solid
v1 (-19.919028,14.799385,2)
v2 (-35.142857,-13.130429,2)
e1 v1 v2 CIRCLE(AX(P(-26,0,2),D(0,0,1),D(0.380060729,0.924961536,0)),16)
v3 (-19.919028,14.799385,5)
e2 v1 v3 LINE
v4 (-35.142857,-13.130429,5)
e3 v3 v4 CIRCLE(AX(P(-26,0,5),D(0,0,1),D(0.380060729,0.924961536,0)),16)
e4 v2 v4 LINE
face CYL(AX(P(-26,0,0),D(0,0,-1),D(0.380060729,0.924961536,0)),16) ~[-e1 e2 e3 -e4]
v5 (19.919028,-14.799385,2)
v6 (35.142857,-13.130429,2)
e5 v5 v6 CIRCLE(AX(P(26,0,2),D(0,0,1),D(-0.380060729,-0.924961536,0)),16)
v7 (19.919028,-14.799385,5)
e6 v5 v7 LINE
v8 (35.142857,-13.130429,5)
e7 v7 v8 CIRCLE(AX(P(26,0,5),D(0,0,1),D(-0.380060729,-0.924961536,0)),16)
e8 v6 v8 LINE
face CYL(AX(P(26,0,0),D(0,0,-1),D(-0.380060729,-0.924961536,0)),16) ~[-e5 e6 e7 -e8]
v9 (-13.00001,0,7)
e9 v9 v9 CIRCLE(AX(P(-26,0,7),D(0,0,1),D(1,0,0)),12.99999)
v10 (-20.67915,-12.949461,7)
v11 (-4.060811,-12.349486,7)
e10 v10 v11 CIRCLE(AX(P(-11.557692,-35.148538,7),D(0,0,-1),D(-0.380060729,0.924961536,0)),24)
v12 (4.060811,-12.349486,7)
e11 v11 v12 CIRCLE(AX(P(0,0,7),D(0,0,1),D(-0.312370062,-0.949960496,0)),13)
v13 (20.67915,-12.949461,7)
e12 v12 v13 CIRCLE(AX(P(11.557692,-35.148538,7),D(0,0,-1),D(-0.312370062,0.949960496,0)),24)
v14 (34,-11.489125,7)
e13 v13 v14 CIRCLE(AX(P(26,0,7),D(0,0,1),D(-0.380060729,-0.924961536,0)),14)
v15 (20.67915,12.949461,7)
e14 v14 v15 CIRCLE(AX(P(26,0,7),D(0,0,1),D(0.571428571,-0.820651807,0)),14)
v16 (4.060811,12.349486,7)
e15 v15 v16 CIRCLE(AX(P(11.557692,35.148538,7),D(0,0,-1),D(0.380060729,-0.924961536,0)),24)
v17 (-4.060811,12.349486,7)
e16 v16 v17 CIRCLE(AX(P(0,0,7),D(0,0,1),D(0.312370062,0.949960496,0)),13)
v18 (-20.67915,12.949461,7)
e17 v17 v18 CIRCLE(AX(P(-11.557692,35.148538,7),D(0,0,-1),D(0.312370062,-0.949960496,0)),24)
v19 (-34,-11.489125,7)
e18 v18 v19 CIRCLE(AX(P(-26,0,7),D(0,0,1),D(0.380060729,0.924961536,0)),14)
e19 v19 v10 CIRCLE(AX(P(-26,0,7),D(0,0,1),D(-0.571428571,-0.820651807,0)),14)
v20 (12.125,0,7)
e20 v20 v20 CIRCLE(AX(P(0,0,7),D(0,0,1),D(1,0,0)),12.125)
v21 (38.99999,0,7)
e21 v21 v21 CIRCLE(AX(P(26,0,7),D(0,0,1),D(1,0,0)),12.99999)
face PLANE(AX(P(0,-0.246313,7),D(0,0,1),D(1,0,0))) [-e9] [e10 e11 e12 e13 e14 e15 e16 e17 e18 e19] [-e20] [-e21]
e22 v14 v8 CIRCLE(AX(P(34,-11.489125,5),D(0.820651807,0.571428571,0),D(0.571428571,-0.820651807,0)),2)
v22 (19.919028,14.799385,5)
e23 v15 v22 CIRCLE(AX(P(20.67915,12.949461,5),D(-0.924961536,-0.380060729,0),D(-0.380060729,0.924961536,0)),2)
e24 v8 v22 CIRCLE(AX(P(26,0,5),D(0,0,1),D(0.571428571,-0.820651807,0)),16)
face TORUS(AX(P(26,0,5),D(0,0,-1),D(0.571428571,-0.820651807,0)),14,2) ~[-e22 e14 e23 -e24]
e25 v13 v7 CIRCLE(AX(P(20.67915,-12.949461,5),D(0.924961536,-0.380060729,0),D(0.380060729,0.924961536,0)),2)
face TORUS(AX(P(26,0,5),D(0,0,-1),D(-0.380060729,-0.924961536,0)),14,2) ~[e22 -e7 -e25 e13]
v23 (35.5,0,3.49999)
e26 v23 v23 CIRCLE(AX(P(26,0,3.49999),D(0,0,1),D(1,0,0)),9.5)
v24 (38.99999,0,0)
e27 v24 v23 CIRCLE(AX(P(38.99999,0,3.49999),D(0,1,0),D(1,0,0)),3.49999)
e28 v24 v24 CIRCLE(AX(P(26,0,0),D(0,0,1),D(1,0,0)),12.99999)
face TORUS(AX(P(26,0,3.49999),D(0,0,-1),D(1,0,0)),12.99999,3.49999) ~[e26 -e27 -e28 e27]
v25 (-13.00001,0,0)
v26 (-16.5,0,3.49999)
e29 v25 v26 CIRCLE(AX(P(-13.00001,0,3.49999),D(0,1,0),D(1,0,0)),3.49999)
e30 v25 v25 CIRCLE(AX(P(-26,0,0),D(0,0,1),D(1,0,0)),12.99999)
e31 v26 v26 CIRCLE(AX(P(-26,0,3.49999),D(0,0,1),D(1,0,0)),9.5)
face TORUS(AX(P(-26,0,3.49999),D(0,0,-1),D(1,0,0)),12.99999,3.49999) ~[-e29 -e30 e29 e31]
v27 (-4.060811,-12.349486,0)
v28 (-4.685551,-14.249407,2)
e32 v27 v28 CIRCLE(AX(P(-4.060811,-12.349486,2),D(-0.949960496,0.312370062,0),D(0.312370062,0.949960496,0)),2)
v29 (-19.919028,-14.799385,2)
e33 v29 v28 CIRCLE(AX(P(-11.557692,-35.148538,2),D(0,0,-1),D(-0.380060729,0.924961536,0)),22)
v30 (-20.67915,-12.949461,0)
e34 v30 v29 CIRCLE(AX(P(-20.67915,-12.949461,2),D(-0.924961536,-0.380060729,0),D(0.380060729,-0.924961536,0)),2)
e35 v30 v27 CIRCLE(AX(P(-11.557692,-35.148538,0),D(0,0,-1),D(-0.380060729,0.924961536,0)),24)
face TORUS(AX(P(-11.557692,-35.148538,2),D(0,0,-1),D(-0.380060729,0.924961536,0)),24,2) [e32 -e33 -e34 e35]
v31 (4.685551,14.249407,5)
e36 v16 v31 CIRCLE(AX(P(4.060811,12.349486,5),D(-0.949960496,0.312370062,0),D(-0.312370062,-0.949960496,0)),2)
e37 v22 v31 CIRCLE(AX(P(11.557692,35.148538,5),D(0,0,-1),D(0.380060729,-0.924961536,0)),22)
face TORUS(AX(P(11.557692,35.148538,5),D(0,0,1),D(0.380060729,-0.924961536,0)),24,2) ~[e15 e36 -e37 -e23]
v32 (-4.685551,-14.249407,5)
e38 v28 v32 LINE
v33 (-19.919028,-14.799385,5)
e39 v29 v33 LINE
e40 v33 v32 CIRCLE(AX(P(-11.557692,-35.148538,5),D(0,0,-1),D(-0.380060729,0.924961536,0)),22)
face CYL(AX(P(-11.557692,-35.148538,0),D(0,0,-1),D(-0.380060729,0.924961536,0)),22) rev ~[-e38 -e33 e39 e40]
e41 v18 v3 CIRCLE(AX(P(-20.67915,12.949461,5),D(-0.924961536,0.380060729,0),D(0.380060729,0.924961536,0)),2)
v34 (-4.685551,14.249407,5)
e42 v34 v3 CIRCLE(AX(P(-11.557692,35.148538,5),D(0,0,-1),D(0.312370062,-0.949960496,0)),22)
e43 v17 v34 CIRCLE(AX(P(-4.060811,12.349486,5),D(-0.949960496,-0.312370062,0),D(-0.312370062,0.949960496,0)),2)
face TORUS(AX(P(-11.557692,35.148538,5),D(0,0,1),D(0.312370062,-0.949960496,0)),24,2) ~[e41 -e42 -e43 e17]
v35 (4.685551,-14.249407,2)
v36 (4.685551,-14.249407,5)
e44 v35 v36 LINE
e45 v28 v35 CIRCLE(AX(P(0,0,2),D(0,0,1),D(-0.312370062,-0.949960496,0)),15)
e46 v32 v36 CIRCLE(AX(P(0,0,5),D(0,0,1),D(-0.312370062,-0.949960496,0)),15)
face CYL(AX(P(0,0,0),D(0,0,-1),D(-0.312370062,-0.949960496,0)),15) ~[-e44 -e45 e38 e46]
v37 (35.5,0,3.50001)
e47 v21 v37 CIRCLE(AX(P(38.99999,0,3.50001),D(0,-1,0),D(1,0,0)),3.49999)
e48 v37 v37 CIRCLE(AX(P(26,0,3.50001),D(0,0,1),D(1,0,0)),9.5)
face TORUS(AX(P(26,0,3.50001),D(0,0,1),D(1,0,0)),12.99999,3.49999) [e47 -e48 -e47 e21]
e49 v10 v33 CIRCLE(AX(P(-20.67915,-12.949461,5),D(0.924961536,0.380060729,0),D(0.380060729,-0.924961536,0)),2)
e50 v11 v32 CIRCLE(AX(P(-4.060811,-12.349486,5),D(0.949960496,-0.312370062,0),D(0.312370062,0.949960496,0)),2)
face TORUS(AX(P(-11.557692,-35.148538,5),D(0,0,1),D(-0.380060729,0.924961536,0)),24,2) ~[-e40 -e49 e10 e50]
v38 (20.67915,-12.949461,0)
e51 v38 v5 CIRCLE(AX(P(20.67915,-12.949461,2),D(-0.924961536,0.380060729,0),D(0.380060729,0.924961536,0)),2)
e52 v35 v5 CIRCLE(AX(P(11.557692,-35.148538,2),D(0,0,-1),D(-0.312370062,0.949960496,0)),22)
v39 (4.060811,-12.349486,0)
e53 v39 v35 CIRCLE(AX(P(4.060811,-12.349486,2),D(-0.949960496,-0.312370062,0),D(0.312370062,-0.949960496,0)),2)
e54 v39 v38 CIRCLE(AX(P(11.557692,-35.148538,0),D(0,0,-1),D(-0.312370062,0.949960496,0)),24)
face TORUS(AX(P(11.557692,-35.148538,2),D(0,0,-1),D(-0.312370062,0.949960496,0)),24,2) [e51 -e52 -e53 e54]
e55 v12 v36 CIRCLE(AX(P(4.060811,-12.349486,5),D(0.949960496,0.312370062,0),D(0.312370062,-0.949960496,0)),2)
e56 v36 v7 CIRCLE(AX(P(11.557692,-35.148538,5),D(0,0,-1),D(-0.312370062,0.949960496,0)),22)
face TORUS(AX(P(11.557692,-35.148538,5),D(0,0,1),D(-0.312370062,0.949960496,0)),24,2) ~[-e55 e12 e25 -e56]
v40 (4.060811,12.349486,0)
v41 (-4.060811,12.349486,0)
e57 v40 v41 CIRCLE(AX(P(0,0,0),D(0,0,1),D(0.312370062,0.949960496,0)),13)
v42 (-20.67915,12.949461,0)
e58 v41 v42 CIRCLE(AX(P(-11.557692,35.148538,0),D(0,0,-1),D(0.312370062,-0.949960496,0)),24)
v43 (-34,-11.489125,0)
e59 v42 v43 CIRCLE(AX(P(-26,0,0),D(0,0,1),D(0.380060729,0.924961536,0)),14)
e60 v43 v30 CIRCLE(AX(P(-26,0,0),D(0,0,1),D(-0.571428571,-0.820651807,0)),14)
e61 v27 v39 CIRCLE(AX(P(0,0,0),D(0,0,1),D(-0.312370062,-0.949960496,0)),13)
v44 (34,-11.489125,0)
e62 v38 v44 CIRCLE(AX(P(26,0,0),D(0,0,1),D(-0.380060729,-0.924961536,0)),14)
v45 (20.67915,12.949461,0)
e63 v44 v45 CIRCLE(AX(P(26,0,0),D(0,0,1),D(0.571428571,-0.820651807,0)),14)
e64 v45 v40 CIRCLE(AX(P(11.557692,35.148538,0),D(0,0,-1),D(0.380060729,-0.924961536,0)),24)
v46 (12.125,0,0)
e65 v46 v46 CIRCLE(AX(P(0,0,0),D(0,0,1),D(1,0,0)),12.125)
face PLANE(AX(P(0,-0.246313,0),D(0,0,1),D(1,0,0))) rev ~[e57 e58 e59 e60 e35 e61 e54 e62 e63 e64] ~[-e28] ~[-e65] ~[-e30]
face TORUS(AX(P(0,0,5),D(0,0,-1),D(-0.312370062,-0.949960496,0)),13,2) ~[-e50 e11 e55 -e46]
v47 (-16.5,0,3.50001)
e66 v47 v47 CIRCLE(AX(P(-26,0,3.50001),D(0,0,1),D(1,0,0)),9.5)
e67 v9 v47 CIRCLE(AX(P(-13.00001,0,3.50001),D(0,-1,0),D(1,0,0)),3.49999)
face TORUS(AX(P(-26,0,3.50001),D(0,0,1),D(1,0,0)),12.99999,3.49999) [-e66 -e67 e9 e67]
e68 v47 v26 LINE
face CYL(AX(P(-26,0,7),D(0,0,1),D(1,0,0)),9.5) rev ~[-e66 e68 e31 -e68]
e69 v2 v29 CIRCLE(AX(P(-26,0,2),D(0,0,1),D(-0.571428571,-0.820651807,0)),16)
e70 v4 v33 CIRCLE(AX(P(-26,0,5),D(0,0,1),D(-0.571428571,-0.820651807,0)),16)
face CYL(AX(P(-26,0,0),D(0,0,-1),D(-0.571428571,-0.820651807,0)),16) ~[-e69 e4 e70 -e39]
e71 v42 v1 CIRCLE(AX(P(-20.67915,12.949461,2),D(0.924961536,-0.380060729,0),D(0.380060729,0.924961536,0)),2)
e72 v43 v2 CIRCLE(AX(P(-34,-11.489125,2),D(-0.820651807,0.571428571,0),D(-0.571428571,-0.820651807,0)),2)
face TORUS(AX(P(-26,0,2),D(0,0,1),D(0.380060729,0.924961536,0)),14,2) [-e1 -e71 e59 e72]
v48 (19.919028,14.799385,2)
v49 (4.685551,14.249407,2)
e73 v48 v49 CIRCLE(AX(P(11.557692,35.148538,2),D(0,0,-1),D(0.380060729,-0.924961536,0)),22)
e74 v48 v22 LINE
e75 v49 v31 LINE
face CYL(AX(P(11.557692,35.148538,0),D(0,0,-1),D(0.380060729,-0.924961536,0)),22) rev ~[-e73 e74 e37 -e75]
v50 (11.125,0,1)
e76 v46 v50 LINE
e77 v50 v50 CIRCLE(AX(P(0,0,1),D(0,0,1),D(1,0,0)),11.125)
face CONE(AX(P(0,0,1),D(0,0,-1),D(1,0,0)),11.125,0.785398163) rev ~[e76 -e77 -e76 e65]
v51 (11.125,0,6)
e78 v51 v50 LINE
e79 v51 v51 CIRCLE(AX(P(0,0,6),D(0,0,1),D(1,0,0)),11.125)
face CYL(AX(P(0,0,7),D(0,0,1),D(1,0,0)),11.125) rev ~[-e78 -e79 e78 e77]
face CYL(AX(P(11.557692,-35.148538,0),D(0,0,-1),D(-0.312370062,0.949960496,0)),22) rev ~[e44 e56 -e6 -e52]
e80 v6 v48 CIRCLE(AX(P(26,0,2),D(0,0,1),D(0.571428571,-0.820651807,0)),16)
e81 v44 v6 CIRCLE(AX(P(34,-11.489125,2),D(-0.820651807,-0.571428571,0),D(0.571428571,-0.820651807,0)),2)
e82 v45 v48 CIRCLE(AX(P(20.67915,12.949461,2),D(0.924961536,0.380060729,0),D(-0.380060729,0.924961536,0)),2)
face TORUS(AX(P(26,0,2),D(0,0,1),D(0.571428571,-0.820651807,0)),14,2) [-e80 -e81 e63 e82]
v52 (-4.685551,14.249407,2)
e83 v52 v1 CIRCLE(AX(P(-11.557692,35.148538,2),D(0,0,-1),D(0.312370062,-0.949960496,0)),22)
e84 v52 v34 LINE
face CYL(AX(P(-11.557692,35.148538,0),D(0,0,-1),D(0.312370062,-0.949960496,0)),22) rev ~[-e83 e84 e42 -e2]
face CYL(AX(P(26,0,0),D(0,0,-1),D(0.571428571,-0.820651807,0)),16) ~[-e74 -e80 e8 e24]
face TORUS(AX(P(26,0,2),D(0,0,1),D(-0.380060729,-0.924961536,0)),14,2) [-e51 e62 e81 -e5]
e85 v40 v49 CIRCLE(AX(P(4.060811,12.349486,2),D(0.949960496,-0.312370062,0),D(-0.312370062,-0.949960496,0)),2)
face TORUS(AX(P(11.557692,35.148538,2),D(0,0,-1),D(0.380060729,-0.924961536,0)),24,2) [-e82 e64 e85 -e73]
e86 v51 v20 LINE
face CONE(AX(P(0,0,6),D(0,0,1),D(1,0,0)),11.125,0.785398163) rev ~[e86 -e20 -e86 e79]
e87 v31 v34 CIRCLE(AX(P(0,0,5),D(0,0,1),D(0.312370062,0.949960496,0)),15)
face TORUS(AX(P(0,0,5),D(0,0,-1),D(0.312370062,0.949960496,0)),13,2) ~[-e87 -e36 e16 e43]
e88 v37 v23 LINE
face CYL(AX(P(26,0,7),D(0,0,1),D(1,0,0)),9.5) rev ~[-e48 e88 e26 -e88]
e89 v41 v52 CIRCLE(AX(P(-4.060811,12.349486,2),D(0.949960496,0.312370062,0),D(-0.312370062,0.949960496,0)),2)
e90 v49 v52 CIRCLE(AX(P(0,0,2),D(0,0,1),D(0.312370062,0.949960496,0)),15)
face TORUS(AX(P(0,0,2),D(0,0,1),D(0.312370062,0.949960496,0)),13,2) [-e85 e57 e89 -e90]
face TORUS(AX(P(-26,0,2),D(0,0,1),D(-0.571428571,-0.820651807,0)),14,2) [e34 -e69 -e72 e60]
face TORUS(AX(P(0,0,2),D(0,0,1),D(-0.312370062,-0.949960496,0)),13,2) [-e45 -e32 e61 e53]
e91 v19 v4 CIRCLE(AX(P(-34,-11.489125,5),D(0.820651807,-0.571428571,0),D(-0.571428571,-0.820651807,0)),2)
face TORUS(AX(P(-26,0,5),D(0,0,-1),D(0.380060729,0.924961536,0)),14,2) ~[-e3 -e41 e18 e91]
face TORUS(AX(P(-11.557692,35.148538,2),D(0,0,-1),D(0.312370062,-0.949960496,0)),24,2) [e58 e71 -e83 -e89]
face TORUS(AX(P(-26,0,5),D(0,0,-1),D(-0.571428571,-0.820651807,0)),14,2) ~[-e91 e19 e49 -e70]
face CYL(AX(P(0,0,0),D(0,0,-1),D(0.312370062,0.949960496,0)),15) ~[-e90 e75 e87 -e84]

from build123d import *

# Parameters (mm, degrees)
F1_DEPTH = 7
F2_R     = 11.125
F3_DEPTH = 7.001
F4_R     = 2
F5_R     = 9.5
F6_DEPTH = 7.001
F7_R     = 3.49999
F8_SIZE  = 1


# Not quite as in the source:
# - a fillet or chamfer is up to 0.001 mm smaller than in the source, because OpenCascade refuses the exact size


with BuildPart() as f1:
    # F0 (on Top) → F1 (new body)
    with BuildSketch(Plane.XY):
        with BuildLine():
            ThreePointArc((-19.9190283401, -14.7993845707), (-12.3514453516, -13.1628621978), (-4.6855509356, -14.2494074414))
            ThreePointArc((-4.6855509356, -14.2494074414), (0, -15), (4.6855509356, -14.2494074414))
            ThreePointArc((4.6855509356, -14.2494074414), (12.3514453516, -13.1628621978), (19.9190283401, -14.7993845707))
            ThreePointArc((19.9190283401, -14.7993845707), (27.7435994179, -15.9047119141), (35.1428571429, -13.1304289064))
            ThreePointArc((35.1428571429, -13.1304289064), (40.048573091, 7.6575187957), (19.9190283401, 14.7993845707))
            ThreePointArc((19.9190283401, 14.7993845707), (12.3514453516, 13.1628621978), (4.6855509356, 14.2494074414))
            ThreePointArc((4.6855509356, 14.2494074414), (0, 15), (-4.6855509356, 14.2494074414))
            ThreePointArc((-4.6855509356, 14.2494074414), (-12.3514453516, 13.1628621978), (-19.9190283401, 14.7993845707))
            ThreePointArc((-19.9190283401, 14.7993845707), (-40.048573091, 7.6575187957), (-35.1428571429, -13.1304289064))
            ThreePointArc((-35.1428571429, -13.1304289064), (-27.7435994179, -15.9047119141), (-19.9190283401, -14.7993845707))
        make_face()
    extrude(amount=F1_DEPTH)

    # F2 (on face) → F3 (cut, through all)
    with BuildSketch(Plane.XY.offset(7)):
        Circle(F2_R)
    extrude(amount=-F3_DEPTH, mode=Mode.SUBTRACT)

    # F4
    f4_edges = [f1.edges().sort_by_distance(p)[0] for p in [
        (-19.919028, -14.799385, 3.5),
        (-42, 0, 0),
        (-19.919028, 14.799385, 3.5),
        (-42, 0, 7),
        (-4.685551, -14.249407, 3.5),
        (-12.351445, -13.162862, 0),
        (-12.351445, -13.162862, 7),
        (4.685551, -14.249407, 3.5),
        (0, -15, 0),
        (0, -15, 7),
        (19.919028, -14.799385, 3.5),
        (12.351445, -13.162862, 0),
        (12.351445, -13.162862, 7),
        (42, 0, 7),
        (19.919028, 14.799385, 3.5),
        (42, 0, 0),
        (4.685551, 14.249407, 3.5),
        (12.351445, 13.162862, 0),
        (12.351445, 13.162862, 7),
        (-4.685551, 14.249407, 3.5),
        (0, 15, 0),
        (0, 15, 7),
        (-12.351445, 13.162862, 0),
        (-12.351445, 13.162862, 7),
    ]]
    fillet(f4_edges, radius=F4_R)

    # F5 (on face) → F6 (cut, through all)
    with BuildSketch(Plane.XY.offset(7)):
        with Locations((-26, 0)):
            Circle(F5_R)
        with Locations((26, 0)):
            Circle(F5_R)
    extrude(amount=-F6_DEPTH, mode=Mode.SUBTRACT)

    # F7 (radius 3.5 in the source; OpenCascade refuses exactly that, so slightly less here)
    f7_edges = [f1.edges().sort_by_distance(p)[0] for p in [
        (-35.5, 0, 7),
        (-16.5, 0, 3.5),
        (-35.5, 0, 0),
        (16.5, 0, 7),
        (35.5, 0, 3.5),
        (16.5, 0, 0),
    ]]
    fillet(f7_edges, radius=F7_R)

    # F8
    f8_edges = [f1.edges().sort_by_distance(p)[0] for p in [
        (-11.125, 0, 7),
        (11.125, 0, 3.5),
        (-11.125, 0, 0),
    ]]
    chamfer(f8_edges, length=F8_SIZE)


solid = f1.part
